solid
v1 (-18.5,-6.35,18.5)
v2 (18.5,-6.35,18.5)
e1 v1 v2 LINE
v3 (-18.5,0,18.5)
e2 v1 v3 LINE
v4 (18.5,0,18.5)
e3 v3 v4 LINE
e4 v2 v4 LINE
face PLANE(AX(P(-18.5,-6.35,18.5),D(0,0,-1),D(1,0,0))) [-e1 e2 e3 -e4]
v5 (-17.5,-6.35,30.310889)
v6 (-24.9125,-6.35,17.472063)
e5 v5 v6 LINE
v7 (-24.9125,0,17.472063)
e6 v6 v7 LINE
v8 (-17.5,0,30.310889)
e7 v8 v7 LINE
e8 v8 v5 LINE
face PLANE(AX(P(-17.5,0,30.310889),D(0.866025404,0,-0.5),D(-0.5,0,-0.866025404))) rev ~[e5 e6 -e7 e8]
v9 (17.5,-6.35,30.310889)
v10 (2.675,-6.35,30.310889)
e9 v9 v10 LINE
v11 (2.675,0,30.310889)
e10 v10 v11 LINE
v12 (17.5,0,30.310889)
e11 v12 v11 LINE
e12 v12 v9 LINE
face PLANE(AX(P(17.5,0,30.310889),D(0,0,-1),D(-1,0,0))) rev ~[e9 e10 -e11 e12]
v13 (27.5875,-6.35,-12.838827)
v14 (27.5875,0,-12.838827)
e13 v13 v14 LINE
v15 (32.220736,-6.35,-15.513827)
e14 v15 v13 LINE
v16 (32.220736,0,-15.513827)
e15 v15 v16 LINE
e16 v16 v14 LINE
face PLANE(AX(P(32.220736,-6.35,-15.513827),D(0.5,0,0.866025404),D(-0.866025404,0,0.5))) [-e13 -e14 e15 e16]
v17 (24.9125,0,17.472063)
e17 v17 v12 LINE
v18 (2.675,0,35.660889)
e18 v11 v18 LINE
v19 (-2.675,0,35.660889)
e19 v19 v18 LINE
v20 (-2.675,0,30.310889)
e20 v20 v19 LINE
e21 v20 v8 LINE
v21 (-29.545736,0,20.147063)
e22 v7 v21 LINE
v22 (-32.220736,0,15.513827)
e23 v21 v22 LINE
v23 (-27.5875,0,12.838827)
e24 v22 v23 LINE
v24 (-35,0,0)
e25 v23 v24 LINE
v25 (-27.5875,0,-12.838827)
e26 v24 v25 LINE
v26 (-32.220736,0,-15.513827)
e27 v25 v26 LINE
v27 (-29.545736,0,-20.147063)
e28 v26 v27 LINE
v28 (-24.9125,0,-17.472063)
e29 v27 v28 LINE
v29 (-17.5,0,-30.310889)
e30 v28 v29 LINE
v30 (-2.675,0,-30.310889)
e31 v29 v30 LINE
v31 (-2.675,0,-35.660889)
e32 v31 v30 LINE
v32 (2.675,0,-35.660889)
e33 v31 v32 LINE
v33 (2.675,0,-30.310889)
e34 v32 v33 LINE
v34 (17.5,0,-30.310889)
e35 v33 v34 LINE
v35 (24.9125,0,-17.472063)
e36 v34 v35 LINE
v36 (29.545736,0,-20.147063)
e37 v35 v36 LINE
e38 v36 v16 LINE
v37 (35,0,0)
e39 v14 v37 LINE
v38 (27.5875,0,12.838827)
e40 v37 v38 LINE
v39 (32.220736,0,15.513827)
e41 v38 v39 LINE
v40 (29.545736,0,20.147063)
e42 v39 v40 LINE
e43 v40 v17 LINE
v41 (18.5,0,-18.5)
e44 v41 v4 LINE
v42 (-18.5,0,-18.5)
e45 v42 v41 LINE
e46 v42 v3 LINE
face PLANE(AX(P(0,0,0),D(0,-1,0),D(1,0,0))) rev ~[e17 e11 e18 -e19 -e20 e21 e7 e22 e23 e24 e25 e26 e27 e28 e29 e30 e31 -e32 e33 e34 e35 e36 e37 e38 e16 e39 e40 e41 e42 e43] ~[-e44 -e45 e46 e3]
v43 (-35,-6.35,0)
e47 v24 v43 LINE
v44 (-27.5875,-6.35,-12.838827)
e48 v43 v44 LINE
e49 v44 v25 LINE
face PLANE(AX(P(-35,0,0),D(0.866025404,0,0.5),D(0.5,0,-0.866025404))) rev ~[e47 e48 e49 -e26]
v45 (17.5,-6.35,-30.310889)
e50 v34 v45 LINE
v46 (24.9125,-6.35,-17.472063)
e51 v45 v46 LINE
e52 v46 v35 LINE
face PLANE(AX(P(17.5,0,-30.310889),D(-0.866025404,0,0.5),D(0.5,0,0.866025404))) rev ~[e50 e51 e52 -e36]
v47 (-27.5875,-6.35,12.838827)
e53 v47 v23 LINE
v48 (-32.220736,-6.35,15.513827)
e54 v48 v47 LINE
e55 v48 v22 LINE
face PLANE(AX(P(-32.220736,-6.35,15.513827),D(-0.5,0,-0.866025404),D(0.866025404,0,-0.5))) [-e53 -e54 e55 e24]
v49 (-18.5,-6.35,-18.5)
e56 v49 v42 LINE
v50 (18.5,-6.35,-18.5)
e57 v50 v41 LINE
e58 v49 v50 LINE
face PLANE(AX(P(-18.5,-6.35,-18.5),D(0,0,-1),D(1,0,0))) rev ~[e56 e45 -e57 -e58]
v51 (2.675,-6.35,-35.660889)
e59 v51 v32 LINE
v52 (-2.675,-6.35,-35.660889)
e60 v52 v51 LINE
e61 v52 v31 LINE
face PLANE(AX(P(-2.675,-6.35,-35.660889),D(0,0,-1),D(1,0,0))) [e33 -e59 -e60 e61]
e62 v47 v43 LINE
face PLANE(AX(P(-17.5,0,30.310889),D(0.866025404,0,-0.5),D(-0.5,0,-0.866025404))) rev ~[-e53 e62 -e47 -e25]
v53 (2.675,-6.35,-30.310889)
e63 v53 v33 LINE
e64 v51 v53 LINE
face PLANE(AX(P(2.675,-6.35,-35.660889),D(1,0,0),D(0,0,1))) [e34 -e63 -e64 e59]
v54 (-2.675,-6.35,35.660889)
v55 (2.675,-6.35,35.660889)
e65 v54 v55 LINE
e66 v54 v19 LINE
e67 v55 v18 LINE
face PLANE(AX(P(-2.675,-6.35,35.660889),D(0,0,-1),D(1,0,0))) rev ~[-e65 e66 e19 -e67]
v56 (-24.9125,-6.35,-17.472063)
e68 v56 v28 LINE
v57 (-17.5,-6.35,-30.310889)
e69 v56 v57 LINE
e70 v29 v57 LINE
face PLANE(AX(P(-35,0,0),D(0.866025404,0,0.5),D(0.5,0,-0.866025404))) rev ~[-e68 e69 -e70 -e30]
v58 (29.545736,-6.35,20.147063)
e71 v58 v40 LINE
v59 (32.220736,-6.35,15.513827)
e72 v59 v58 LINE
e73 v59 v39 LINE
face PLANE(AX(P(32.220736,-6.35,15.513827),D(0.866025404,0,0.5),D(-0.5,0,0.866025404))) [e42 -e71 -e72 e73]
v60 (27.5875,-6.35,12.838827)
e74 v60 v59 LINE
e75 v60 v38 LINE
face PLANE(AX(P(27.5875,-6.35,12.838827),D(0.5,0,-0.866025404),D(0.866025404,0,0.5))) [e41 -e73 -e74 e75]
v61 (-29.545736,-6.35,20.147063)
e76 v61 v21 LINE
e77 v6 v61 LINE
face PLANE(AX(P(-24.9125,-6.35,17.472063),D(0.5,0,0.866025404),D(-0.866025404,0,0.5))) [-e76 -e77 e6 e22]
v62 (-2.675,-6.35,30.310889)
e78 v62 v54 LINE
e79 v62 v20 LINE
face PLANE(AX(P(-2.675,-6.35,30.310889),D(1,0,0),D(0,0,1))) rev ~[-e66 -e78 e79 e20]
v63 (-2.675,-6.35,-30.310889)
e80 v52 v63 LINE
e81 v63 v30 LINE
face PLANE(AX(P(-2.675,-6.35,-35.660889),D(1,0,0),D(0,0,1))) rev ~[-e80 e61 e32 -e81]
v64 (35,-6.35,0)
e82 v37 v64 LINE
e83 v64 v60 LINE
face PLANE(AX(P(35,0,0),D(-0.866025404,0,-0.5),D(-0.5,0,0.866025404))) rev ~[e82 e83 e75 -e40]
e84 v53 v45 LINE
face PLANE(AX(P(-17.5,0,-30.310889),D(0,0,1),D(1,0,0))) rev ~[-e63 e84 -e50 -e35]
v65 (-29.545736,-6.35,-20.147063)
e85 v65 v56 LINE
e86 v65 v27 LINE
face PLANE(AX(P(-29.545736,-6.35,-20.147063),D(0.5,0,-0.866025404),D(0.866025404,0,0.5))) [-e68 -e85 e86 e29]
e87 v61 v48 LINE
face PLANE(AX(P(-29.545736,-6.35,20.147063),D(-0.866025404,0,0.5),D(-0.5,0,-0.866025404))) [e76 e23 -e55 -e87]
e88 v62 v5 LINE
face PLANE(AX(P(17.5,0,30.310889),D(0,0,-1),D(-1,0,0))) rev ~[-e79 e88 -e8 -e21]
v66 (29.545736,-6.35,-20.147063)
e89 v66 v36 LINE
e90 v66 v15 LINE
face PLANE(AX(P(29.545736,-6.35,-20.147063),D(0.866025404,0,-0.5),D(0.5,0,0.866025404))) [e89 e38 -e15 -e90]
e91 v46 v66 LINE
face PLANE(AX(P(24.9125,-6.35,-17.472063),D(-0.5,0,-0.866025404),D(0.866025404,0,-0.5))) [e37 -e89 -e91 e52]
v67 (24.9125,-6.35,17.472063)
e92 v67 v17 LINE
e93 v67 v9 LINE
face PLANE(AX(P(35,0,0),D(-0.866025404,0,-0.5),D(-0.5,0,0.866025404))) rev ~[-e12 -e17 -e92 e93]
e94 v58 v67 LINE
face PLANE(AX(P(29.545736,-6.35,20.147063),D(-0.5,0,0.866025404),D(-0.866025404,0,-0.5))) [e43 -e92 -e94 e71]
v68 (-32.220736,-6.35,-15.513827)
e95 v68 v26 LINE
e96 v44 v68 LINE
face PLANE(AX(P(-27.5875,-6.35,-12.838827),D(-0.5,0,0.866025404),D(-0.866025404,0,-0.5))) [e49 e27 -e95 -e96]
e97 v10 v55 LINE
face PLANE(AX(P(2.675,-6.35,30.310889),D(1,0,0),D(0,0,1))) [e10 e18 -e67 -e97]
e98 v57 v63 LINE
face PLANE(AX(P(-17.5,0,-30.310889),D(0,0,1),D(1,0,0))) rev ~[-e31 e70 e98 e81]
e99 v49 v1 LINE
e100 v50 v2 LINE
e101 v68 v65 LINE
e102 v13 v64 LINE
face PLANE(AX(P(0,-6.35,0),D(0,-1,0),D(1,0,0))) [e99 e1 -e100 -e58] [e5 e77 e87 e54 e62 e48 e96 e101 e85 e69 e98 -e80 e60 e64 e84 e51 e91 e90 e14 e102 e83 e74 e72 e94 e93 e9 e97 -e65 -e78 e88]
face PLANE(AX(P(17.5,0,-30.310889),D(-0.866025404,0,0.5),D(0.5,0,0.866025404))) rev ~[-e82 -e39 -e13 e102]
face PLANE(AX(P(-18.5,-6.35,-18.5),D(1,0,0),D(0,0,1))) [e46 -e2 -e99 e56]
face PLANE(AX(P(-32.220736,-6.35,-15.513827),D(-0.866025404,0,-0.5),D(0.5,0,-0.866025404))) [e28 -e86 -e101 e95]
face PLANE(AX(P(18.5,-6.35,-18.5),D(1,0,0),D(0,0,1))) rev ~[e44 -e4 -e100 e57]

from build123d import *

# Parameters (mm, degrees)
F1_DEPTH = 6.35
F2_W     = 5.35
F2_H     = 5.35
F3_DEPTH = 6.35
F4_W     = 37
F4_H     = 37
F5_DEPTH = 25


# Not quite as in the source:
# - a length typed as a fraction of an inch, garbled in the dataset ("3 / 203.2 mm" for 3/8 in), is restored


with BuildPart() as f1:
    # F0 (on Front) → F1 (new body)
    with BuildSketch(Plane.XZ):
        Polygon((17.5, -30.3108891325), (35, 0), (17.5, 30.3108891325), (-17.5, 30.3108891325), (-35, 0), (-17.5, -30.3108891325), align=None)
    extrude(amount=F1_DEPTH)

    # F2 (on face) → F3 (join)
    with BuildSketch(Plane.XZ.offset(6.35)):
        with Locations((0, 32.9858891325)):
            Rectangle(F2_W, F2_H)
        with Locations((0, -32.9858891325)):
            Rectangle(F2_W, F2_H)
        Polygon((29.5457359102, 20.1470625214), (24.9125, 17.4720625214), (27.5875, 12.8388266111), (32.2207359102, 15.5138266111), align=None)
        Polygon((-32.2207359102, 15.5138266111), (-27.5875, 12.8388266111), (-24.9125, 17.4720625214), (-29.5457359102, 20.1470625214), align=None)
        Polygon((-24.9125, -17.4720625214), (-27.5875, -12.8388266111), (-32.2207359102, -15.5138266111), (-29.5457359102, -20.1470625214), align=None)
        Polygon((27.5875, -12.8388266111), (24.9125, -17.4720625214), (29.5457359102, -20.1470625214), (32.2207359102, -15.5138266111), align=None)
    extrude(amount=-F3_DEPTH)

    # F4 (on face) → F5 (cut)
    with BuildSketch(Plane.XZ.offset(6.35)):
        Rectangle(F4_W, F4_H)
    extrude(amount=-F5_DEPTH, mode=Mode.SUBTRACT)


solid = f1.part
